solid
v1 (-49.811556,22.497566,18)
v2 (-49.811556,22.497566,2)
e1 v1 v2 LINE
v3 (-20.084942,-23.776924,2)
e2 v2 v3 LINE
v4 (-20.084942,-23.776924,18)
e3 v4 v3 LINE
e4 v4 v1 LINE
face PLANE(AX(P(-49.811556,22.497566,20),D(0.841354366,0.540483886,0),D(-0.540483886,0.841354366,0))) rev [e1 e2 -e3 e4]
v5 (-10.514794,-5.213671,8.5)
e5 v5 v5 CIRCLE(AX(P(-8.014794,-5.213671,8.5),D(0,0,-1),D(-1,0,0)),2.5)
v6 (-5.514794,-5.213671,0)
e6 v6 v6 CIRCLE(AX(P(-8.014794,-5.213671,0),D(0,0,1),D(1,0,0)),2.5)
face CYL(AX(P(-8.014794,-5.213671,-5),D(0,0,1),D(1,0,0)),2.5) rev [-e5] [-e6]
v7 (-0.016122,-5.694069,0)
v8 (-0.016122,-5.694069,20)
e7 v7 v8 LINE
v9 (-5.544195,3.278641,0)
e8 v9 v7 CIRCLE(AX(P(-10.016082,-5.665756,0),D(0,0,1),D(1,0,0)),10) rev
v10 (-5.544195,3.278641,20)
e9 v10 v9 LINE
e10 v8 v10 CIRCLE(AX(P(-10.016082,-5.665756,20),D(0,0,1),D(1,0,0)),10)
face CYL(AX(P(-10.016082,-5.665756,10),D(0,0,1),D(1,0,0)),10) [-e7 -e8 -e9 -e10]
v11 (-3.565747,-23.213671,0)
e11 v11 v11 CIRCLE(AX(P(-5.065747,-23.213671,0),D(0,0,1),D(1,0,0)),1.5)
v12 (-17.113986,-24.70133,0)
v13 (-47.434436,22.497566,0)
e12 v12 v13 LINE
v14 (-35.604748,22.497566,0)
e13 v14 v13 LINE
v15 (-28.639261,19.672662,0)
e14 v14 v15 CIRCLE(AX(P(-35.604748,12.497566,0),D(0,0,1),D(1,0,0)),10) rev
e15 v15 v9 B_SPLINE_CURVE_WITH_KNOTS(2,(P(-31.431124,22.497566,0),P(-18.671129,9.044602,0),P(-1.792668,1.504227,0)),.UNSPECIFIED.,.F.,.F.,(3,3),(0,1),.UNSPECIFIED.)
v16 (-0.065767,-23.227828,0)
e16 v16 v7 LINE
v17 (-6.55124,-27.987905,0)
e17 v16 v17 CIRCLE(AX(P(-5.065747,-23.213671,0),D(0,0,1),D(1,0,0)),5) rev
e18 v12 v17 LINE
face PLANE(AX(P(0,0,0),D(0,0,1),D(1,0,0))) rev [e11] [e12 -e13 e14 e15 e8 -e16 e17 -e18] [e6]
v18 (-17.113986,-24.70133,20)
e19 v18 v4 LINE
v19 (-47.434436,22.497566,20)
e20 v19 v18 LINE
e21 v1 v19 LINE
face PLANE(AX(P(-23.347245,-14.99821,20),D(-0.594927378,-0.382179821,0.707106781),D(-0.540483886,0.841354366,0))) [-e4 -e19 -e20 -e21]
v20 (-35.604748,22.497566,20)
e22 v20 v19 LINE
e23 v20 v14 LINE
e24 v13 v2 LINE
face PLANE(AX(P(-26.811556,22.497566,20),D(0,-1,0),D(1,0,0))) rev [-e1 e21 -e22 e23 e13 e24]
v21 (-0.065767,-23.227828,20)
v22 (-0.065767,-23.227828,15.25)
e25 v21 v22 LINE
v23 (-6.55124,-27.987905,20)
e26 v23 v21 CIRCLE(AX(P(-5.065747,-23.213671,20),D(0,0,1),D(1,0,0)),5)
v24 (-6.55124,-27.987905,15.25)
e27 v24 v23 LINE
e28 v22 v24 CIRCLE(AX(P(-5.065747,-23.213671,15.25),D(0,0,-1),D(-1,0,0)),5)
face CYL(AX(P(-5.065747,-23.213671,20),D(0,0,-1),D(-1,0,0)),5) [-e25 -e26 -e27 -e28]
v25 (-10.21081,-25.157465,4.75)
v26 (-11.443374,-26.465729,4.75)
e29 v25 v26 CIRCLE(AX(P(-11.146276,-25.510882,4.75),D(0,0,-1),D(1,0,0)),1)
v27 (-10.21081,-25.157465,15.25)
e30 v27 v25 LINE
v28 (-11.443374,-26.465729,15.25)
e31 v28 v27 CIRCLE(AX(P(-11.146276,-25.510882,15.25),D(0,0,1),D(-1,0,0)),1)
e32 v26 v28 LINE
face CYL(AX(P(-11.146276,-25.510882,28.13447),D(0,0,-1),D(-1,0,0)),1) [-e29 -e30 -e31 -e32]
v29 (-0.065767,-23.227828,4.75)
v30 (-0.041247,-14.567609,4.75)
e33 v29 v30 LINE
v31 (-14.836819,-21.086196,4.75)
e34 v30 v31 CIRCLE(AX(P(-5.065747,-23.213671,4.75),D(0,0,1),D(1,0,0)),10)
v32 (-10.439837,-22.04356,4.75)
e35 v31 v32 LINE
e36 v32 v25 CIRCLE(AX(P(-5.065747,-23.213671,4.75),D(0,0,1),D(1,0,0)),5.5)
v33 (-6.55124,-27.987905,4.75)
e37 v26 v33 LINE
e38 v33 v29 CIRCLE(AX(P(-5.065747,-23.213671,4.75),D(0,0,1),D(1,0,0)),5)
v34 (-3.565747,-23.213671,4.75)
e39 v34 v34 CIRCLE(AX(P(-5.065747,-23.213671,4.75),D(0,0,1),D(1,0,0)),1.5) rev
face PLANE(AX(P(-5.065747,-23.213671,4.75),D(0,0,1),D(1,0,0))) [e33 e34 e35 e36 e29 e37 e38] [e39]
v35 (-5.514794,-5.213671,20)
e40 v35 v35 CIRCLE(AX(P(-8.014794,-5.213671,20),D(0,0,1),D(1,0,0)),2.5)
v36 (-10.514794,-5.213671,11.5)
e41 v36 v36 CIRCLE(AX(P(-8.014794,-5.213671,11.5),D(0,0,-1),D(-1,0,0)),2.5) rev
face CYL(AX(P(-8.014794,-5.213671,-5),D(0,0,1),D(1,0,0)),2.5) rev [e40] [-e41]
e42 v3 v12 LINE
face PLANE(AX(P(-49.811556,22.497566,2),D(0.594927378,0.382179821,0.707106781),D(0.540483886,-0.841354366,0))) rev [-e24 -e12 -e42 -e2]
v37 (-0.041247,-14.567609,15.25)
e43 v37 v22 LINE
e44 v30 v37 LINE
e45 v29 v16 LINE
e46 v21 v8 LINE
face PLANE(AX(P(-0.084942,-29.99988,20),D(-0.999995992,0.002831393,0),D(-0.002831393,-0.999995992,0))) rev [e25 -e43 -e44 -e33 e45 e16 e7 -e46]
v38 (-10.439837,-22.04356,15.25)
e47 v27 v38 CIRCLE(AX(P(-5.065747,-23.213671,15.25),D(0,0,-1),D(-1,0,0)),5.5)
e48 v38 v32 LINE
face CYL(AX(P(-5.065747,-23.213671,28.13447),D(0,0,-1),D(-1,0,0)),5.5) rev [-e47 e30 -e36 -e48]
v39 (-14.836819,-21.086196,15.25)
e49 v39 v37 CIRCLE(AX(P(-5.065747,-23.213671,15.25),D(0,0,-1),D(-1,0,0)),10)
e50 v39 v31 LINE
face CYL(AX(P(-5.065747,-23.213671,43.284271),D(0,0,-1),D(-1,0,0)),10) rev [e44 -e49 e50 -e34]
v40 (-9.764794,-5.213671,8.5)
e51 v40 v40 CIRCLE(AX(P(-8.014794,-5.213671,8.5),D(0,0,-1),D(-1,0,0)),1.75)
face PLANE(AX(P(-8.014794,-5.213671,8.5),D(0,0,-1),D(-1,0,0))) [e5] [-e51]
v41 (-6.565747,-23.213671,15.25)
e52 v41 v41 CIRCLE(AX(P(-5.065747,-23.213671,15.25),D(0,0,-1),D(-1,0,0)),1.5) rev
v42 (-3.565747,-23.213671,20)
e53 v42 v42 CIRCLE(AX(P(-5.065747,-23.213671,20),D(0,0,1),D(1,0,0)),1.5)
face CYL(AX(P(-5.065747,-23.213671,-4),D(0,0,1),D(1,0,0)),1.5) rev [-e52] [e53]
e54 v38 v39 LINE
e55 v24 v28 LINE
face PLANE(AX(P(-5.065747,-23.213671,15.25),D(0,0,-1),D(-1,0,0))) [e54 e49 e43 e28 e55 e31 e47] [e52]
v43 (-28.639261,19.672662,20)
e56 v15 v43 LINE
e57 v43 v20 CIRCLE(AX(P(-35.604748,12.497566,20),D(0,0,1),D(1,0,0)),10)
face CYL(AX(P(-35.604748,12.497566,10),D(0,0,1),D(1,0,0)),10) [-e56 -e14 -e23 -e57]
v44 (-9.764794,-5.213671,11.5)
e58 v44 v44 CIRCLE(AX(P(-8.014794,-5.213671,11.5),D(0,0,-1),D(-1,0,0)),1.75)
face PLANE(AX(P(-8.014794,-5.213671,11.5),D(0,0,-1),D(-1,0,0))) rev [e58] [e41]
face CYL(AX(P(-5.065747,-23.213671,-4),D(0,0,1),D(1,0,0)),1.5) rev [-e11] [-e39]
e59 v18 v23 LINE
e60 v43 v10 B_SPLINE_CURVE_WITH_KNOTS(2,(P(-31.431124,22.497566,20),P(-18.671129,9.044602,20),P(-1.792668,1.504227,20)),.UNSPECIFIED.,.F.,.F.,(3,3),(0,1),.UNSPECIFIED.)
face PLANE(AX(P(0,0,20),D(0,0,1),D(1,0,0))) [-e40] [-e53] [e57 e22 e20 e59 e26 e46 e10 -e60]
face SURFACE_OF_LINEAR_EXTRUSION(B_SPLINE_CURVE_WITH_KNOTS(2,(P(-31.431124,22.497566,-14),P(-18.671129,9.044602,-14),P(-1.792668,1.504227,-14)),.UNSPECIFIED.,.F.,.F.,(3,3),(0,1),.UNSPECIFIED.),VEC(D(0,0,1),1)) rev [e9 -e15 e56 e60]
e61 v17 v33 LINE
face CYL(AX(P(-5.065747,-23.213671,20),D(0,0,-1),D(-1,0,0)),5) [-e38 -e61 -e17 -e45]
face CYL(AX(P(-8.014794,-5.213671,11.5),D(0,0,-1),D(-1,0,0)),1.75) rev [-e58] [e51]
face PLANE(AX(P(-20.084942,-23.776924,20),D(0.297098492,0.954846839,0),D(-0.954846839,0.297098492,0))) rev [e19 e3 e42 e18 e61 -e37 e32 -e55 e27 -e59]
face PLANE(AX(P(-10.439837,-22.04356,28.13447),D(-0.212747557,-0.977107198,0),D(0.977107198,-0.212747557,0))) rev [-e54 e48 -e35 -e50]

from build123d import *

# Parameters (mm, degrees)
EXTRUDE_1_DEPTH       = 20
FILLET_1_R            = 5
SKETCH_2_R            = 1.5000000000000024
CUT_EXTRUDE_1_DEPTH   = 24
CUT_EXTRUDE_START     = -5
SKETCH_3_R            = 7.5
CUT_EXTRUDE_2_DEPTH   = 10
CHAMFER_1_SIZE        = 2
FILLET_4_R            = 5
SKETCH_5_R            = 2.5000000000000018
CUT_EXTRUDE_3_DEPTH   = 25
EXTRUDE_START         = -11.5
SKETCH_6_R            = 2.5000000000000004
SKETCH_6_R_2          = 1.7499999999999998
EXTRUDE_2_DEPTH       = 3
CUT_EXTRUDE_4_DEPTH   = 34
FILLET_5_R            = 10
FILLET_6_R            = 10
CHAMFER_START         = 15.398006277
CHAMFER_2_OUTLINE_W   = 6.958890637
CHAMFER_2_OUTLINE_H   = 10.000000000000002
CHAMFER_2_DEPTH       = 3.601993723
CHAMFER_START_2       = 14
CHAMFER_2_2_OUTLINE_W = 6.958890637
CHAMFER_2_2_OUTLINE_H = 10.000000000000002
CHAMFER_2_2_DEPTH     = 1.398006277
SKETCH_9_R            = 10.000000000005517
CUT_EXTRUDE_5_DEPTH   = 10
EXTRUDE_4_DEPTH       = 10
FILLET_7_R            = 1
FILLET_8_R            = 10
CUT_EXTRUDE_START_2   = -0.25
CUT_EXTRUDE_6_DEPTH   = 0.25
CUT_EXTRUDE_7_DEPTH   = 0.25


with BuildPart() as part:
    # 草图1 → 凸台-拉伸1 (new body)
    with BuildSketch(Plane.XY):
        Polygon((0, 0), (-26.811555509164208, 22.497566339028918), (-49.8115555091642, 22.49756633902892), (-20.084941781424334, -23.776923785463527), (-0.08494178142433392, -29.999879747988462), align=None)
    extrude(amount=EXTRUDE_1_DEPTH)

    # 圆角1
    fillet_1_edges = [part.edges().sort_by_distance(p)[0] for p in [
        (-0.08494178142433392, -29.999879747988462, 10),
    ]]
    fillet(fillet_1_edges, radius=FILLET_1_R)

    # 草图2 → 切除-拉伸1 (cut)
    with BuildSketch(Plane.XY.offset(20)):
        with Locations((-5.0657473249540095, -23.213671166892293)):
            Circle(SKETCH_2_R)
    extrude(amount=-CUT_EXTRUDE_1_DEPTH, mode=Mode.SUBTRACT)

    # 草图3 → 切除-拉伸2 (cut)
    with BuildSketch(Plane.XY.offset(20).offset(CUT_EXTRUDE_START)):
        with Locations((-5.0657473249540095, -23.213671166892293)):
            Circle(SKETCH_3_R)
    extrude(amount=-CUT_EXTRUDE_2_DEPTH, mode=Mode.SUBTRACT)

    # 倒角1
    chamfer_1_edges = [part.edges().sort_by_distance(p)[0] for p in [
        (-34.94824864529427, -0.6396787232173011, 20),
        (-34.94824864529427, -0.6396787232173011, 0),
    ]]
    chamfer(chamfer_1_edges, length=CHAMFER_1_SIZE)

    # 圆角4
    fillet_4_edges = [part.edges().sort_by_distance(p)[0] for p in [
        (0, 0, 10),
    ]]
    fillet(fillet_4_edges, radius=FILLET_4_R)

    # 草图5 → 切除-拉伸3 (cut)
    with BuildSketch(Plane.XY.offset(20)):
        with Locations((-8.014794077059545, -5.213671166892294)):
            Circle(SKETCH_5_R)
    extrude(amount=-CUT_EXTRUDE_3_DEPTH, mode=Mode.SUBTRACT)

    # 草图6 → 凸台-拉伸2 (add)
    with BuildSketch(Plane(origin=(0, 0, 0), x_dir=(-1, 0, 0), z_dir=(0, 0, -1)).offset(EXTRUDE_START)):
        with Locations(Location((8.014794077059545, -5.213671166892294, 0), (0, 0, 180))):
            Circle(SKETCH_6_R)
        with Locations((8.014794077059545, -5.213671166892294)):
            Circle(SKETCH_6_R_2, mode=Mode.SUBTRACT)
    extrude(amount=EXTRUDE_2_DEPTH)

    # 草图7 → 切除-拉伸4 (cut)
    with BuildSketch(Plane.XY.offset(20)):
        with BuildLine():
            Line((-31.431124160284014, 22.497566339028918), (-26.811555509164208, 22.497566339028918))
            Line((-26.811555509164208, 22.497566339028918), (-1.7926678262045348, 1.5042269117916054))
            add(Edge.make_bspline(
                [(-1.7926678262045348, 1.5042269117916054), (-18.67112927693908, 9.044601568140122), (-31.431124160284014, 22.497566339028918)],
                knots=[0, 0, 0, 1, 1, 1], degree=2))
        make_face()
    extrude(amount=-CUT_EXTRUDE_4_DEPTH, mode=Mode.SUBTRACT)

    # 圆角5
    fillet_5_edges = [part.edges().sort_by_distance(p)[0] for p in [
        (-1.792667826204533, 1.504226911791605, 10),
    ]]
    fillet(fillet_5_edges, radius=FILLET_5_R)

    # 圆角6
    # the kernel refuses this fillet: 10 mm, written as the material it takes off along each edge
    with BuildSketch(Plane(origin=(-11.888995884089002, -26.327074304981263, 5), x_dir=(-0.9548468391902787, 0.29709849156186213, 0), z_dir=(0, 0, 1))) as fillet_6_piece_1:
        with BuildLine():
            CenterArc((11.180339887498954, -9.999999999999998), FILLET_6_R, 90.00000000000001, 73.39845040097977)
            ThreePointArc((1.597191412499857, -7.142857142857143), (1.7290806033645267, -3.3633658232300525), (0, 0))
            Line((0, 0), (11.180339887498953, -2e-17))
        make_face()
    extrude(amount=10, mode=Mode.SUBTRACT)

    # 倒角2: read off the stored shape, not the designer's step
    # 倒角2 outline → 倒角2 (cut)
    with BuildSketch(Plane(origin=(0, 0, 0), x_dir=(0.9972181140668777, 0.0745388018209292, 0), z_dir=(0.07453880182092919, -0.9972181140668778, 0)).offset(CHAMFER_START)):
        with Locations((-4.674246913499999, 10)):
            Rectangle(CHAMFER_2_OUTLINE_W, CHAMFER_2_OUTLINE_H)
    extrude(amount=CHAMFER_2_DEPTH, mode=Mode.SUBTRACT)

    # Chamfer 2 2 outline → Chamfer 2 2 (add)
    with BuildSketch(Plane(origin=(0, 0, 0), x_dir=(0.9972181140668777, 0.0745388018209292, 0), z_dir=(0.07453880182092919, -0.9972181140668778, 0)).offset(CHAMFER_START_2)):
        with Locations((-4.674246913499999, 10)):
            Rectangle(CHAMFER_2_2_OUTLINE_W, CHAMFER_2_2_OUTLINE_H)
    extrude(amount=CHAMFER_2_2_DEPTH)

    # 草图9 → 切除-拉伸5 (cut)
    with BuildSketch(Plane.XY.offset(4.999999999999999)):
        with Locations((-5.065747324960373, -23.21367116689012)):
            Circle(SKETCH_9_R)
    extrude(amount=CUT_EXTRUDE_5_DEPTH, mode=Mode.SUBTRACT)

    # 草图10 → 凸台-拉伸4 (add)
    with BuildSketch(Plane.XY.offset(4.999999999999999)):
        with BuildLine():
            Line((-20.306861182467813, -23.431468792638793), (-20.084941781424334, -23.776923785463527))
            Line((-20.084941781424334, -23.776923785463527), (-8.739068741608744, -27.30716719962209))
            ThreePointArc((-8.739068741608744, -27.30716719962209), (-10.29932188852527, -24.904735118255193), (-10.439836916118015, -22.04355960545204))
            Line((-10.439836916118015, -22.04355960545204), (-14.836819308888755, -21.086195600637897))
            ThreePointArc((-14.836819308888755, -21.086195600637897), (-14.95313679387356, -21.717165406749196), (-15.028752577744056, -22.354295618532444))
            ThreePointArc((-15.028752577744056, -22.354295618532444), (-17.59390852193624, -23.254981419998394), (-20.306861182467813, -23.431468792638793))
        make_face()
    extrude(amount=EXTRUDE_4_DEPTH)

    # 圆角7
    fillet_7_edges = [part.edges().sort_by_distance(p)[0] for p in [
        (-8.739068741608744, -27.30716719962209, 10),
    ]]
    fillet(fillet_7_edges, radius=FILLET_7_R)

    # 圆角8
    fillet_8_edges = [part.edges().sort_by_distance(p)[0] for p in [
        (-31.431124160284014, 22.497566339028918, 10),
    ]]
    fillet(fillet_8_edges, radius=FILLET_8_R)

    # 草图11 → 切除-拉伸6 (cut)
    with BuildSketch(Plane(origin=(0, 0, 15), x_dir=(-1, 0, 0), z_dir=(0, 0, -1)).offset(CUT_EXTRUDE_START_2)):
        with BuildLine():
            Line((6.551239782763319, -27.987905362843687), (11.44337405787706, -26.4657285550041))
            ThreePointArc((11.44337405787706, -26.4657285550041), (10.418424754087408, -26.19661722979815), (10.210809683029842, -25.157464708287105))
            ThreePointArc((10.210809683029842, -25.157464708287105), (10.550931066650136, -23.617105572837715), (10.439836916118015, -22.04355960545204))
            Line((10.439836916118015, -22.04355960545204), (14.836819308888755, -21.086195600637897))
            ThreePointArc((14.836819308888755, -21.086195600637897), (9.097555674937517, -14.06246788922412), (0.04124678677052372, -14.567608806379399))
            Line((0.04124678677052372, -14.567608806379399), (0.06576736695593181, -23.227828130463013))
            ThreePointArc((0.06576736695593181, -23.227828130463013), (2.1072866759334765, -27.24449125568279), (6.551239782763319, -27.987905362843687))
        make_face()
    extrude(amount=CUT_EXTRUDE_6_DEPTH, mode=Mode.SUBTRACT)

    # 草图12 → 切除-拉伸7 (cut)
    with BuildSketch(Plane.XY.offset(4.999999999999999)):
        with BuildLine():
            Line((-14.836819308888755, -21.086195600637897), (-10.439836916118015, -22.04355960545204))
            ThreePointArc((-10.439836916118015, -22.04355960545204), (-10.550931066650133, -23.617105572837712), (-10.21080968302984, -25.157464708287105))
            ThreePointArc((-10.21080968302984, -25.157464708287105), (-10.418424754087408, -26.19661722979815), (-11.44337405787706, -26.465728555004105))
            Line((-11.44337405787706, -26.465728555004105), (-6.551239782763319, -27.987905362843687))
            ThreePointArc((-6.551239782763319, -27.987905362843687), (-2.107286675933478, -27.24449125568279), (-0.06576736695593308, -23.227828130463013))
            Line((-0.06576736695593308, -23.227828130463013), (-0.04124678677052488, -14.567608806379397))
            ThreePointArc((-0.04124678677052488, -14.567608806379397), (-9.097555674937517, -14.062467889224122), (-14.836819308888755, -21.086195600637897))
        make_face()
    extrude(amount=-CUT_EXTRUDE_7_DEPTH, mode=Mode.SUBTRACT)


solid = part.part
